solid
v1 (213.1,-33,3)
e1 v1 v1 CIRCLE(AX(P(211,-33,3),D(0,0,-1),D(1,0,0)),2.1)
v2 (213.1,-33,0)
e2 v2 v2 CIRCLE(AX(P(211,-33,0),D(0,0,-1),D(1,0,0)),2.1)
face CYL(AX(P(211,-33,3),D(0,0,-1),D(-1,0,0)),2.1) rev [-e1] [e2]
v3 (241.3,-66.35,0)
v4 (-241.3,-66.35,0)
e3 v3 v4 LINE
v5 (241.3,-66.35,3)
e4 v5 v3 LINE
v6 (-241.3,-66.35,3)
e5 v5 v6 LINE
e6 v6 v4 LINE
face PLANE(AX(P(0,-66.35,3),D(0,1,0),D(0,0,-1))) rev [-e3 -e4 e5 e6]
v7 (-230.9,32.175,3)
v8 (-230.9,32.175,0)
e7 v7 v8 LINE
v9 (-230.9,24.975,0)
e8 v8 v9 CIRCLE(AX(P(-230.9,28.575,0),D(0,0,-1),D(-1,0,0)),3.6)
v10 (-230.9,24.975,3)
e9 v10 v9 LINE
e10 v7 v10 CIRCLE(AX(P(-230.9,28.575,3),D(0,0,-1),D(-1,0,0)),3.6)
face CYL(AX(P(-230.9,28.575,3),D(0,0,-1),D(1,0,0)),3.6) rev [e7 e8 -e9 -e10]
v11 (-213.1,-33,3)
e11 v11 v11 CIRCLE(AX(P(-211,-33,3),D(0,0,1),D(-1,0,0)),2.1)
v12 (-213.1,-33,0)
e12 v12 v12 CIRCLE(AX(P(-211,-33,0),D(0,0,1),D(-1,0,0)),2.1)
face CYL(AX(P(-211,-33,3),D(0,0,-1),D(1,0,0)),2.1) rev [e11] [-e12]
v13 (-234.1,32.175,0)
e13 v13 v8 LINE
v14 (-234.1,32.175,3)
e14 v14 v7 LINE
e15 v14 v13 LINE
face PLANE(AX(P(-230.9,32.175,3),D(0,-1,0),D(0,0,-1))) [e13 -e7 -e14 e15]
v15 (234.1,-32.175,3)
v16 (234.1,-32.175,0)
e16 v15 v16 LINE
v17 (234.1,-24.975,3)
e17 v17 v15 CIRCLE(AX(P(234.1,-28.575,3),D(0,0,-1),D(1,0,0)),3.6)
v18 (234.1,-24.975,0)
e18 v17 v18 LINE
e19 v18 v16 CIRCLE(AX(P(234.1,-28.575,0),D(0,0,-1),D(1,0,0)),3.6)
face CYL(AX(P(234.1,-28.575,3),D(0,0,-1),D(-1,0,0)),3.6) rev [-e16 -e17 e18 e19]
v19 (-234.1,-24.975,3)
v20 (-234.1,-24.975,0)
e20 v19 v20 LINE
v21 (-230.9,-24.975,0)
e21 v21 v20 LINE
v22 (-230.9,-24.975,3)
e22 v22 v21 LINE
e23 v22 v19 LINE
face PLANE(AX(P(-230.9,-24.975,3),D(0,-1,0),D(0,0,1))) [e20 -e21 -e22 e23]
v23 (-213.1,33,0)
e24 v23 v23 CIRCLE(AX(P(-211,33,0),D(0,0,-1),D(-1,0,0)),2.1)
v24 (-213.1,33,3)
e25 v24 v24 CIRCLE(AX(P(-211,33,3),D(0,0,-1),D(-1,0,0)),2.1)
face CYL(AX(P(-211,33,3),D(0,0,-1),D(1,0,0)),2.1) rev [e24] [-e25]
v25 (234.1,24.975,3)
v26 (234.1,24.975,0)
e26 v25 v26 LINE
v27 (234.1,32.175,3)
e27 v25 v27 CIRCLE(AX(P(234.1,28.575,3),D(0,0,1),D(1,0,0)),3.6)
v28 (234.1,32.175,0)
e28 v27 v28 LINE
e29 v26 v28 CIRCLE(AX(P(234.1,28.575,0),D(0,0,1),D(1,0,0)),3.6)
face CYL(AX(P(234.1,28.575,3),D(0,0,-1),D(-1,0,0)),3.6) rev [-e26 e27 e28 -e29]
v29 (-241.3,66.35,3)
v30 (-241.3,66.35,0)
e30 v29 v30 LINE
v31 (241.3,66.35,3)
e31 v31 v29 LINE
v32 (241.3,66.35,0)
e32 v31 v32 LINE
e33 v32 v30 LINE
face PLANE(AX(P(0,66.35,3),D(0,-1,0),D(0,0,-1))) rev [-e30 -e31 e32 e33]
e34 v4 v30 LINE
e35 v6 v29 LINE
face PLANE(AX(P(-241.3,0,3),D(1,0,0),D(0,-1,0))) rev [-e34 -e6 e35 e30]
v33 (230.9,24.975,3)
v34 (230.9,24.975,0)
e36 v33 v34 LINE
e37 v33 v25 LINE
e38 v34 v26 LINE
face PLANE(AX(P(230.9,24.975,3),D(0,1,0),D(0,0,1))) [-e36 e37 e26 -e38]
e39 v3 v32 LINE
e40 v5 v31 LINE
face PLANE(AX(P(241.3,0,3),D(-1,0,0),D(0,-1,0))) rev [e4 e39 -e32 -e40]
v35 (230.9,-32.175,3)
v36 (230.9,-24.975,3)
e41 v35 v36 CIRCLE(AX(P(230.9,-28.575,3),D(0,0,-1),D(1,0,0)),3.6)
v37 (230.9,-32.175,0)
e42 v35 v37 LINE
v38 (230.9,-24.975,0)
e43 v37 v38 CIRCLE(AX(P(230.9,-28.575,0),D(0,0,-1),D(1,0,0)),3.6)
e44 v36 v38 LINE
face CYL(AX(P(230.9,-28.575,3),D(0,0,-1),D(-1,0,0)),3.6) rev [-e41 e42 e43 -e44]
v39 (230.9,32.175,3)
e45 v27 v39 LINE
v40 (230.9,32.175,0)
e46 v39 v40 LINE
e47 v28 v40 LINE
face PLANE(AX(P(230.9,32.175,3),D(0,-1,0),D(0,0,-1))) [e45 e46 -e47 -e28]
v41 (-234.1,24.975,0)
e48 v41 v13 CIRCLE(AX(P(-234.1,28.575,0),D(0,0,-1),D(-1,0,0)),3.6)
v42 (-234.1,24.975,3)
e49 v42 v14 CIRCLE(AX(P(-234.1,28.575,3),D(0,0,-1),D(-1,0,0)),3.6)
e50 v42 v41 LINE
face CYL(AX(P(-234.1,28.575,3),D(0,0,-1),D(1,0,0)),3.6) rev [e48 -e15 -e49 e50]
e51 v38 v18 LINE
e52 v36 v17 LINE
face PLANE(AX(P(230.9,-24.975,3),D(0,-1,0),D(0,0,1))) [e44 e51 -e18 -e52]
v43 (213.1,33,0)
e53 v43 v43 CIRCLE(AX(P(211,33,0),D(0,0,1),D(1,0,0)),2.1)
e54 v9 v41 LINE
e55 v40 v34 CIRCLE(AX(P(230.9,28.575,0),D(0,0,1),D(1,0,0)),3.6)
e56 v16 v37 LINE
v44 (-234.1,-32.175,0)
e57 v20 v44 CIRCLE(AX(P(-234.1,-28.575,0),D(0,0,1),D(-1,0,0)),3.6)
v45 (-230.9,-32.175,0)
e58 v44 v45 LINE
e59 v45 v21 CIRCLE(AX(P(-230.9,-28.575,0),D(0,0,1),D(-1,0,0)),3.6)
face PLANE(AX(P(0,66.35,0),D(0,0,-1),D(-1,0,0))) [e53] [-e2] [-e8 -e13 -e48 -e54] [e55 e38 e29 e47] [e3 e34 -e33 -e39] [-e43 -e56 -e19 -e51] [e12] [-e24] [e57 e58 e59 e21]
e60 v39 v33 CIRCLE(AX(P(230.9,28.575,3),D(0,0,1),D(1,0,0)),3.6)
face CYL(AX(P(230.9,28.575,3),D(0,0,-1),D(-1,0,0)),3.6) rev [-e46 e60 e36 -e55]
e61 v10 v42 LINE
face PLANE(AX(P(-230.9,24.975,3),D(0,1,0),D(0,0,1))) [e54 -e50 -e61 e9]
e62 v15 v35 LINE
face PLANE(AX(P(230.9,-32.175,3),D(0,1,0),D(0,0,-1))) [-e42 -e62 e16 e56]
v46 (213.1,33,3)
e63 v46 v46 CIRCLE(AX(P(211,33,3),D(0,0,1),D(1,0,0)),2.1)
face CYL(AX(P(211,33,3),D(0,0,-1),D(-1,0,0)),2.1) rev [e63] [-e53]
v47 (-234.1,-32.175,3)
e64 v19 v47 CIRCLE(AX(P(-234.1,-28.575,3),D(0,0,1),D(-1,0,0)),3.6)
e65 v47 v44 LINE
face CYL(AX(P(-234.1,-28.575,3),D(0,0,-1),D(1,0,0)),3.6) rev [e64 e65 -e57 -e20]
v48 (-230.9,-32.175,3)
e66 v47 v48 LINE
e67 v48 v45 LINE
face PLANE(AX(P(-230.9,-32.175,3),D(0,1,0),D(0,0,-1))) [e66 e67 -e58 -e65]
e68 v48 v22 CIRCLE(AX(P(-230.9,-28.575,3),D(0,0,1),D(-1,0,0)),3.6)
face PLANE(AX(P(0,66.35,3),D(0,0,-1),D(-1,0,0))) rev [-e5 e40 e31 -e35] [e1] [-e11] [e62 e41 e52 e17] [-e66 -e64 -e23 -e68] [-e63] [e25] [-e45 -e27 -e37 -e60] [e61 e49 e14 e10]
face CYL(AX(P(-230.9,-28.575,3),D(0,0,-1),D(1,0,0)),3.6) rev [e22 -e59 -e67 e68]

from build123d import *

# Parameters (mm, degrees)
SKETCH1_W          = 241.3
SKETCH1_H          = 66.35
SKETCH1_R          = 2.1
BASE_FLANGE1_DEPTH = 3


# Sheet-metal steps are written as plain solids
with BuildPart() as part:
    # Sketch1 → Base-Flange1 (new body)
    with BuildSketch(Plane.XY):
        with Locations((120.65, 33.175)):
            Rectangle(SKETCH1_W, SKETCH1_H)
        with Locations((211, 33)):
            Circle(SKETCH1_R, mode=Mode.SUBTRACT)
        with BuildLine():
            Line((230.9, 32.175), (234.1, 32.175))
            ThreePointArc((234.1, 32.175), (237.7, 28.575), (234.1, 24.975))
            Line((234.1, 24.975), (230.9, 24.975))
            ThreePointArc((230.9, 24.975), (227.3, 28.575), (230.9, 32.175))
        make_face(mode=Mode.SUBTRACT)
    extrude(amount=BASE_FLANGE1_DEPTH)

    # Mirror1: part across plane


with BuildPart() as part_1:
    add(part.part)
    add(part.part.mirror(Plane(origin=(0, 0, 3), x_dir=(0, 0, 1), z_dir=(0, 1, 0))))

    # Mirror2: part across face


with BuildPart() as part_2:
    add(part_1.part)
    add(part_1.part.mirror(Plane(origin=(0, 0, 1.5), x_dir=(0, 0, 1), z_dir=(-1, 0, 0))))


solid = part_2.part
